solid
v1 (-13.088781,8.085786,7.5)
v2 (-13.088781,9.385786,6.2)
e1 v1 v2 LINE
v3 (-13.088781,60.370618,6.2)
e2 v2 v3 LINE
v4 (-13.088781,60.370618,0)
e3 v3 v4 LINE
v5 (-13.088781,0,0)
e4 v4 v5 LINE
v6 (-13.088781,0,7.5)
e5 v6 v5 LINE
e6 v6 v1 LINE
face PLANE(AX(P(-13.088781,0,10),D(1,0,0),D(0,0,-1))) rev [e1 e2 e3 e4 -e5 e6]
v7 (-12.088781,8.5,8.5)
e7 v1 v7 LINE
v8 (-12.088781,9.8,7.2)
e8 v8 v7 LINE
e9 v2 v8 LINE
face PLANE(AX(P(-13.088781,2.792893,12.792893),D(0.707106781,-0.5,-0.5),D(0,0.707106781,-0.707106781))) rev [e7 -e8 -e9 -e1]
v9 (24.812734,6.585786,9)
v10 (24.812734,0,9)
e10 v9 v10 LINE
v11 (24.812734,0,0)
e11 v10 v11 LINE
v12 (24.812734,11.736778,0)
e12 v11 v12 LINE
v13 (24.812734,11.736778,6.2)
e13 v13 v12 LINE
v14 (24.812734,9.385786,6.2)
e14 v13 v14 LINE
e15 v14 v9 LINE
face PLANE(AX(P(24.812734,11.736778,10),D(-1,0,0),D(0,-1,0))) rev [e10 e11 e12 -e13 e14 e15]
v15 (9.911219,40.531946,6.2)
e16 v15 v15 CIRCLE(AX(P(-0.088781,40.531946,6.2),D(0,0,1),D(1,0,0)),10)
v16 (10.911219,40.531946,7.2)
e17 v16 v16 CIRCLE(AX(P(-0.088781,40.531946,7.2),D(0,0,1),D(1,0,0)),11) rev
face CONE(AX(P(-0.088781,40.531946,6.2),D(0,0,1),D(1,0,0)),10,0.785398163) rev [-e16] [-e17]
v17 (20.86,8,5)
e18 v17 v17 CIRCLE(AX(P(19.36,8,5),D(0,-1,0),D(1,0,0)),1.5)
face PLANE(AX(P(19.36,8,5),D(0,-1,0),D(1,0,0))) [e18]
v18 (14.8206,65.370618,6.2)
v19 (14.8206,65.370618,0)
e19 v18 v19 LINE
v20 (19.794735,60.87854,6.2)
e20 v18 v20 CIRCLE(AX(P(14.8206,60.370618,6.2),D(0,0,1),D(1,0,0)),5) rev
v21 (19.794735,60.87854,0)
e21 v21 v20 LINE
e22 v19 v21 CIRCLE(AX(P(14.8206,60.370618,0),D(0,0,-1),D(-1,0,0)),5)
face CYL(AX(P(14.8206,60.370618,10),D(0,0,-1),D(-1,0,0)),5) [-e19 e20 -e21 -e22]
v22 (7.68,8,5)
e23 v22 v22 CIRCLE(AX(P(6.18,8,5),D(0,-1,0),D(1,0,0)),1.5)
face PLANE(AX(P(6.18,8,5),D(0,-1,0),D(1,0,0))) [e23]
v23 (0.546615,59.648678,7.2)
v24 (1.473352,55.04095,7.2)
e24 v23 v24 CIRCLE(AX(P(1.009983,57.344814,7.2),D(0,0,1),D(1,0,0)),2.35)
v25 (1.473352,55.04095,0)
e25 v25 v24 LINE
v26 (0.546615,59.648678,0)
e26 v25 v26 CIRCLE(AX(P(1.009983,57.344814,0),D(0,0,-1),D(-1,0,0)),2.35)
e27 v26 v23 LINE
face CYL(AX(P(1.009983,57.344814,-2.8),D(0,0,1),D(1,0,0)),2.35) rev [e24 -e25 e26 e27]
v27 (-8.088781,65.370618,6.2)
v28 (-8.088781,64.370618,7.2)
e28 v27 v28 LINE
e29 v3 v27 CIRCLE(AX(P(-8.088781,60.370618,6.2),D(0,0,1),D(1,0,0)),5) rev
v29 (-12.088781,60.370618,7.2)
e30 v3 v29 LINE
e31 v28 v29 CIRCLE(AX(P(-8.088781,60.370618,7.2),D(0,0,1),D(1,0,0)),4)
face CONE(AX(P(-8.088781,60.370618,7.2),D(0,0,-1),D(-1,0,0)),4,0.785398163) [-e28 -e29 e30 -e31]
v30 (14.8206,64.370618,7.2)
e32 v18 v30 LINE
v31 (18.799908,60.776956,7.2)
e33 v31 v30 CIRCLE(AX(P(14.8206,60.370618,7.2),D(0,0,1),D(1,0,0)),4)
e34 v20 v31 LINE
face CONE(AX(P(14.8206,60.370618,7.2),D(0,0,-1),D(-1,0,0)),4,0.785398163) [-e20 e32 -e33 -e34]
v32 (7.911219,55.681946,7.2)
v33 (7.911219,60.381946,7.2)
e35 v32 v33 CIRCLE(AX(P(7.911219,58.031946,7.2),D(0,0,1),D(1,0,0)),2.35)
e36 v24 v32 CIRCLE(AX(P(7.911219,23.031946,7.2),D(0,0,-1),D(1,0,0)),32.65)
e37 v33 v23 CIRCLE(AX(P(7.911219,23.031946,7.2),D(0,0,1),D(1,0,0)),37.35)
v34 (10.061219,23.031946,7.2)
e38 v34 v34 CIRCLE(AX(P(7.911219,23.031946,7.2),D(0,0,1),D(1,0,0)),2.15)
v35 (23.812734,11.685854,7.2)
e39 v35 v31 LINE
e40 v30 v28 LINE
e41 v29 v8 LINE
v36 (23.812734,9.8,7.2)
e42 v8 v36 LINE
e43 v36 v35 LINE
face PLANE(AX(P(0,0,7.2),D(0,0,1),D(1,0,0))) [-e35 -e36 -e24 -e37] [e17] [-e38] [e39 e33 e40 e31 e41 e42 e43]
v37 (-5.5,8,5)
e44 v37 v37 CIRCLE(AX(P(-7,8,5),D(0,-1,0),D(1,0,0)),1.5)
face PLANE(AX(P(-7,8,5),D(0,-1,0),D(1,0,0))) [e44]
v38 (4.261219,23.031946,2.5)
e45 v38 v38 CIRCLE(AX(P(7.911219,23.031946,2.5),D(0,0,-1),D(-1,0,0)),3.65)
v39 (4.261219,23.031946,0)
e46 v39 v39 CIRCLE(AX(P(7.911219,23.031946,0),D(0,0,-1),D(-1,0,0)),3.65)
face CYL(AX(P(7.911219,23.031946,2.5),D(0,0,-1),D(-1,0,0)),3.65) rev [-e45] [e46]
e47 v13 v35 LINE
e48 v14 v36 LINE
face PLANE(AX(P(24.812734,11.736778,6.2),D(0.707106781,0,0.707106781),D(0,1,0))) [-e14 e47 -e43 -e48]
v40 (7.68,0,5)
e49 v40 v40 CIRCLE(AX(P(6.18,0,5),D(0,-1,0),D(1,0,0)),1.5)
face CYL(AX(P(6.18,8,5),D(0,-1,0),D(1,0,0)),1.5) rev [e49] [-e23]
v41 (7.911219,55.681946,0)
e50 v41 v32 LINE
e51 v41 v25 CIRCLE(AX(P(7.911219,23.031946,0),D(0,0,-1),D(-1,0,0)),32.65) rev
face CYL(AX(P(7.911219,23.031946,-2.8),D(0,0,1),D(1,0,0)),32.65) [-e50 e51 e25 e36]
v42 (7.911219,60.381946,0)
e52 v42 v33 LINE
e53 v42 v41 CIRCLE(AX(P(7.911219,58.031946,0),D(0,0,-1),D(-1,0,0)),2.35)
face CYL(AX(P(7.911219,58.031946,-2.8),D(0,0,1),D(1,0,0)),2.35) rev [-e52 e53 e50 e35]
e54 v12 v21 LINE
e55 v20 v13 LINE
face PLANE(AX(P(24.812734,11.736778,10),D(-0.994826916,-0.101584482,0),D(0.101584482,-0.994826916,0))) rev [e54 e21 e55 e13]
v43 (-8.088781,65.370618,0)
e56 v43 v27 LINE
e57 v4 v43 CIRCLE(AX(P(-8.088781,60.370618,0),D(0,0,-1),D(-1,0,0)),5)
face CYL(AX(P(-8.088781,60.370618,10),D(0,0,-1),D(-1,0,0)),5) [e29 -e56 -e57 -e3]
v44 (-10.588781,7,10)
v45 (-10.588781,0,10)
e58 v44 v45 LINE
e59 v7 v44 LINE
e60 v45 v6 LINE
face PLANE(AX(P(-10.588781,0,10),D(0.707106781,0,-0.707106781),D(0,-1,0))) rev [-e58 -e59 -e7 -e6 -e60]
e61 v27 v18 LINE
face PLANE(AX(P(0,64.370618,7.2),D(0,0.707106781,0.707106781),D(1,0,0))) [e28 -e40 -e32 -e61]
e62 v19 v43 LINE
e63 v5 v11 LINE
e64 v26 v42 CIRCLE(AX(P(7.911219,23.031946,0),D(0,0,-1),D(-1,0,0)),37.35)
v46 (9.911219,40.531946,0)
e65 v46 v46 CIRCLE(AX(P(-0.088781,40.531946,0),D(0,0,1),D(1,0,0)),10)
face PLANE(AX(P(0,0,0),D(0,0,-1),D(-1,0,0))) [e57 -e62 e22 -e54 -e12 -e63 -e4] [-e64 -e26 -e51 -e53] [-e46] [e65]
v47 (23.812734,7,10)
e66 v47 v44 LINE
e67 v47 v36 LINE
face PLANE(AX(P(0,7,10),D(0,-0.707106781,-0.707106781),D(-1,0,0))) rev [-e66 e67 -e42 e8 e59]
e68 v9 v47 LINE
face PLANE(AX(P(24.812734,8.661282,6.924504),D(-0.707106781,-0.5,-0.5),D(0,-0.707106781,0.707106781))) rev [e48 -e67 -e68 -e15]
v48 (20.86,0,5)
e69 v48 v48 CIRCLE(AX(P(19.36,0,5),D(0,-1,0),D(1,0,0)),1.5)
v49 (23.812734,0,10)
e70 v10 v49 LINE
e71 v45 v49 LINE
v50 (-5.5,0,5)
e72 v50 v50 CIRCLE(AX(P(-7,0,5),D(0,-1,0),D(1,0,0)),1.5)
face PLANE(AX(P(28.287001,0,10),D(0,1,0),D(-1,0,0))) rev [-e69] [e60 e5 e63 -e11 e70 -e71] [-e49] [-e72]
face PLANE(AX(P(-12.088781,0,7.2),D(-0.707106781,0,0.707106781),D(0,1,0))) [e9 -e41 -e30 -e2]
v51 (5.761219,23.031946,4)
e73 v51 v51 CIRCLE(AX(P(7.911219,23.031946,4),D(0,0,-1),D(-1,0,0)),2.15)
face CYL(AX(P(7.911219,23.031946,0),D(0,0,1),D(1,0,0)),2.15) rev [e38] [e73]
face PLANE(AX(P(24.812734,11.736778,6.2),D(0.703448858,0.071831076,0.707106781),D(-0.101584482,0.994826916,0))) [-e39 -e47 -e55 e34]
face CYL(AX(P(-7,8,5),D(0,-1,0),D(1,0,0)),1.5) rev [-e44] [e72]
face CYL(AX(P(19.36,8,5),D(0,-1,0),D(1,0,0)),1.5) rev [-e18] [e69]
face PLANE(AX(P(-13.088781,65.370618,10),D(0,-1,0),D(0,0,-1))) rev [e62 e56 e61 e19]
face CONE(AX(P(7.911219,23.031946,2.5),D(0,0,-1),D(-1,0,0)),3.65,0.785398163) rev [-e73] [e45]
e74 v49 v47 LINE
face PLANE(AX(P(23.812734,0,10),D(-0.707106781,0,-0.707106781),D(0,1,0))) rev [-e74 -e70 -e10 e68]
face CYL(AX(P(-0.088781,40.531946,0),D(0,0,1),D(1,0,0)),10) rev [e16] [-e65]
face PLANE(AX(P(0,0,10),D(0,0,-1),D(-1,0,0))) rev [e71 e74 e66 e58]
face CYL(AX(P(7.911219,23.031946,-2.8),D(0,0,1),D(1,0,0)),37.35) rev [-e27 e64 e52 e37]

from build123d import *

# Parameters (mm, degrees)
AUFSATZ_LINEAR_AUSTRAGEN1_DEPTH      = 10
SKIZZE2_R                            = 1.5
SCHNITT_LINEAR_AUSTRAGEN1_DEPTH      = 8
SCHNITT_LINEAR_AUSTRAGEN3_DEPTH      = 2.8
SCHNITT_LINEAR_AUSTRAGEN5_DEPTH      = 72.591285383
SCHNITT_LINEAR_AUSTRAGEN5_DEPTH_BACK = 72.591285383
SKIZZE7_R                            = 10
FASE1_SIZE                           = 3
SCHNITT_LINEAR_AUSTRAGEN4_DEPTH      = 10
VERRUNDUNG1_R                        = 5
FASE2_SIZE                           = 1
FASE3_SIZE                           = 2.5
SKIZZE9_R                            = 2.15
SCHNITT_LINEAR_AUSTRAGEN7_DEPTH      = 71.291034025
SKIZZE10_R                           = 3.65
SCHNITT_LINEAR_AUSTRAGEN8_DEPTH      = 2.5
FASE4_SIZE                           = 1.5
SCHNITT_LINEAR_AUSTRAGEN9_DEPTH      = 10


# Some blends are built 0.0001 mm under size
with BuildPart() as part:
    # Skizze1 → Aufsatz-Linear austragen1 (new body)
    with BuildSketch(Plane.XY):
        Polygon((28.287001282, 57.370618027), (28.287001282, 0), (-13.088781156, 0), (-13.088781156, 27.348243657), (-13.088781156, 53.715647777), (-13.088781156, 57.370618027), (-13.088781156, 65.370618027), (28.287001282, 65.370618027), align=None)
    extrude(amount=AUFSATZ_LINEAR_AUSTRAGEN1_DEPTH)

    # Skizze2 → Schnitt-Linear austragen1 (cut)
    with BuildSketch(Plane.XZ):
        with Locations((-7, 5)):
            Circle(SKIZZE2_R)
        with Locations((6.18, 5)):
            Circle(SKIZZE2_R)
        with Locations((19.36, 5)):
            Circle(SKIZZE2_R)
    extrude(amount=-SCHNITT_LINEAR_AUSTRAGEN1_DEPTH, mode=Mode.SUBTRACT)

    # Skizze4 → Schnitt-Linear austragen3 (cut)
    with BuildSketch(Plane.XY.offset(10)):
        Polygon((-15.095168359, 10), (28.287001282, 10), (36.093332102, 46.989971623), (30.429094825, 65.957451721), (-16.081030445, 65.957451721), (-16.081030445, 27.753515123), align=None)
    extrude(amount=-SCHNITT_LINEAR_AUSTRAGEN3_DEPTH, mode=Mode.SUBTRACT)

    # Skizze7 → Schnitt-Linear austragen5 (cut, two sides: drawn at the far end of the back side and taken through both)
    with BuildSketch(Plane.XY.offset(7.2).offset(-SCHNITT_LINEAR_AUSTRAGEN5_DEPTH_BACK)):
        with Locations((-0.088781156, 40.531945717)):
            Circle(SKIZZE7_R)
    extrude(amount=SCHNITT_LINEAR_AUSTRAGEN5_DEPTH + SCHNITT_LINEAR_AUSTRAGEN5_DEPTH_BACK, mode=Mode.SUBTRACT)

    # Fase1
    # the kernel refuses this chamfer: 3 mm, written as the material it takes off along each edge
    with BuildSketch(Plane(origin=(-20.80383012, 10, 10), x_dir=(0, -0.9996219169112969, 0.027495876610586202), z_dir=(1, 0, 0))) as fase1_piece_1_section:
        Polygon((FASE1_SIZE * 0.999621916911, FASE1_SIZE * 0.0274958766106), (-FASE1_SIZE * 0.0274958766106, FASE1_SIZE * 0.999621916911), (0, 0), align=None)
    fase1_piece_1 = extrude(amount=56.805880365, mode=Mode.PRIVATE)
    fase1_piece_1 = split(fase1_piece_1, bisect_by=Plane(origin=(7.599110063, 8.999392985, 7.2), z_dir=(0, 0, 1)), keep=Keep.TOP, mode=Mode.PRIVATE)
    add(fase1_piece_1, mode=Mode.SUBTRACT)

    # Skizze5 → Schnitt-Linear austragen4 (cut)
    with BuildSketch(Plane(origin=(0, 0, 0), x_dir=(-1, 0, 0), z_dir=(0, 0, -1))):
        Polygon((-24.81273389, 11.736777957), (-19.336036603, 65.370618027), (-28.287001282, 65.370618027), (-28.287001282, 0), (-24.81273389, 0), align=None)
    extrude(amount=-SCHNITT_LINEAR_AUSTRAGEN4_DEPTH, mode=Mode.SUBTRACT)

    # Verrundung1
    verrundung1_edges = [part.edges().sort_by_distance(p)[0] for p in [
        (-13.088781156, 65.370618027, 3.6),
        (19.336036603, 65.370618027, 3.6),
    ]]
    fillet(verrundung1_edges, radius=VERRUNDUNG1_R)

    # Fase2
    fase2_edges = [part.edges().sort_by_distance(p)[0] for p in [
        (-13.088781156, 35.085309014, 7.2),
        (3.365909563, 65.370618027, 7.2),
        (22.303734377, 36.307659198, 7.2),
        (18.17174844, 64.081386954, 7.2),
        (-11.624315062, 63.906151933, 7.2),
        (-10.088781156, 40.531945717, 7.2),
        (-13.088781156, 8.4, 8.6),
        (24.81273389, 8.4, 8.6),
        (24.81273389, 10.768388979, 7.2),
        (24.81273389, 3.5, 10),
    ]]
    chamfer(fase2_edges, length=FASE2_SIZE)

    # Fase3
    fase3_edges = [part.edges().sort_by_distance(p)[0] for p in [
        (-13.088781156, 2.792893219, 10),
    ]]
    chamfer(fase3_edges, length=FASE3_SIZE)

    # Skizze9 → Schnitt-Linear austragen7 (cut, through all)
    with BuildSketch(Plane.XY.offset(7.2)):
        with Locations((7.911218844, 58.031945717)):
            Circle(SKIZZE9_R)
        with Locations((7.911218844, 23.031945717)):
            Circle(SKIZZE9_R)
    extrude(amount=-SCHNITT_LINEAR_AUSTRAGEN7_DEPTH, mode=Mode.SUBTRACT)

    # Skizze10 → Schnitt-Linear austragen8 (cut)
    with BuildSketch(Plane(origin=(0, 0, 0), x_dir=(-1, 0, 0), z_dir=(0, 0, -1))):
        with Locations((-7.911218844, 23.031945717)):
            Circle(SKIZZE10_R)
    extrude(amount=-SCHNITT_LINEAR_AUSTRAGEN8_DEPTH, mode=Mode.SUBTRACT)

    # Fase4
    fase4_edges = [part.edges().sort_by_distance(p)[0] for p in [
        (5.761218844, 23.031945717, 2.5),
    ]]
    chamfer(fase4_edges, length=FASE4_SIZE - 0.0001)  # a hair under: the kernel refuses the full size

    # Skizze11 → Schnitt-Linear austragen9 (cut)
    with BuildSketch(Plane.XY.offset(7.2)):
        with BuildLine():
            ThreePointArc((7.911218844, 60.381945717), (4.210709496, 60.198176768), (0.546614537, 59.648678277))
            ThreePointArc((0.546614537, 59.648678277), (-1.293880815, 56.88144557), (1.473351893, 55.040950218))
            ThreePointArc((1.473351893, 55.040950218), (4.676369307, 55.521301643), (7.911218844, 55.681945717))
            ThreePointArc((7.911218844, 55.681945717), (10.261218844, 58.031945717), (7.911218844, 60.381945717))
        make_face()
    extrude(amount=-SCHNITT_LINEAR_AUSTRAGEN9_DEPTH, mode=Mode.SUBTRACT)


solid = part.part
